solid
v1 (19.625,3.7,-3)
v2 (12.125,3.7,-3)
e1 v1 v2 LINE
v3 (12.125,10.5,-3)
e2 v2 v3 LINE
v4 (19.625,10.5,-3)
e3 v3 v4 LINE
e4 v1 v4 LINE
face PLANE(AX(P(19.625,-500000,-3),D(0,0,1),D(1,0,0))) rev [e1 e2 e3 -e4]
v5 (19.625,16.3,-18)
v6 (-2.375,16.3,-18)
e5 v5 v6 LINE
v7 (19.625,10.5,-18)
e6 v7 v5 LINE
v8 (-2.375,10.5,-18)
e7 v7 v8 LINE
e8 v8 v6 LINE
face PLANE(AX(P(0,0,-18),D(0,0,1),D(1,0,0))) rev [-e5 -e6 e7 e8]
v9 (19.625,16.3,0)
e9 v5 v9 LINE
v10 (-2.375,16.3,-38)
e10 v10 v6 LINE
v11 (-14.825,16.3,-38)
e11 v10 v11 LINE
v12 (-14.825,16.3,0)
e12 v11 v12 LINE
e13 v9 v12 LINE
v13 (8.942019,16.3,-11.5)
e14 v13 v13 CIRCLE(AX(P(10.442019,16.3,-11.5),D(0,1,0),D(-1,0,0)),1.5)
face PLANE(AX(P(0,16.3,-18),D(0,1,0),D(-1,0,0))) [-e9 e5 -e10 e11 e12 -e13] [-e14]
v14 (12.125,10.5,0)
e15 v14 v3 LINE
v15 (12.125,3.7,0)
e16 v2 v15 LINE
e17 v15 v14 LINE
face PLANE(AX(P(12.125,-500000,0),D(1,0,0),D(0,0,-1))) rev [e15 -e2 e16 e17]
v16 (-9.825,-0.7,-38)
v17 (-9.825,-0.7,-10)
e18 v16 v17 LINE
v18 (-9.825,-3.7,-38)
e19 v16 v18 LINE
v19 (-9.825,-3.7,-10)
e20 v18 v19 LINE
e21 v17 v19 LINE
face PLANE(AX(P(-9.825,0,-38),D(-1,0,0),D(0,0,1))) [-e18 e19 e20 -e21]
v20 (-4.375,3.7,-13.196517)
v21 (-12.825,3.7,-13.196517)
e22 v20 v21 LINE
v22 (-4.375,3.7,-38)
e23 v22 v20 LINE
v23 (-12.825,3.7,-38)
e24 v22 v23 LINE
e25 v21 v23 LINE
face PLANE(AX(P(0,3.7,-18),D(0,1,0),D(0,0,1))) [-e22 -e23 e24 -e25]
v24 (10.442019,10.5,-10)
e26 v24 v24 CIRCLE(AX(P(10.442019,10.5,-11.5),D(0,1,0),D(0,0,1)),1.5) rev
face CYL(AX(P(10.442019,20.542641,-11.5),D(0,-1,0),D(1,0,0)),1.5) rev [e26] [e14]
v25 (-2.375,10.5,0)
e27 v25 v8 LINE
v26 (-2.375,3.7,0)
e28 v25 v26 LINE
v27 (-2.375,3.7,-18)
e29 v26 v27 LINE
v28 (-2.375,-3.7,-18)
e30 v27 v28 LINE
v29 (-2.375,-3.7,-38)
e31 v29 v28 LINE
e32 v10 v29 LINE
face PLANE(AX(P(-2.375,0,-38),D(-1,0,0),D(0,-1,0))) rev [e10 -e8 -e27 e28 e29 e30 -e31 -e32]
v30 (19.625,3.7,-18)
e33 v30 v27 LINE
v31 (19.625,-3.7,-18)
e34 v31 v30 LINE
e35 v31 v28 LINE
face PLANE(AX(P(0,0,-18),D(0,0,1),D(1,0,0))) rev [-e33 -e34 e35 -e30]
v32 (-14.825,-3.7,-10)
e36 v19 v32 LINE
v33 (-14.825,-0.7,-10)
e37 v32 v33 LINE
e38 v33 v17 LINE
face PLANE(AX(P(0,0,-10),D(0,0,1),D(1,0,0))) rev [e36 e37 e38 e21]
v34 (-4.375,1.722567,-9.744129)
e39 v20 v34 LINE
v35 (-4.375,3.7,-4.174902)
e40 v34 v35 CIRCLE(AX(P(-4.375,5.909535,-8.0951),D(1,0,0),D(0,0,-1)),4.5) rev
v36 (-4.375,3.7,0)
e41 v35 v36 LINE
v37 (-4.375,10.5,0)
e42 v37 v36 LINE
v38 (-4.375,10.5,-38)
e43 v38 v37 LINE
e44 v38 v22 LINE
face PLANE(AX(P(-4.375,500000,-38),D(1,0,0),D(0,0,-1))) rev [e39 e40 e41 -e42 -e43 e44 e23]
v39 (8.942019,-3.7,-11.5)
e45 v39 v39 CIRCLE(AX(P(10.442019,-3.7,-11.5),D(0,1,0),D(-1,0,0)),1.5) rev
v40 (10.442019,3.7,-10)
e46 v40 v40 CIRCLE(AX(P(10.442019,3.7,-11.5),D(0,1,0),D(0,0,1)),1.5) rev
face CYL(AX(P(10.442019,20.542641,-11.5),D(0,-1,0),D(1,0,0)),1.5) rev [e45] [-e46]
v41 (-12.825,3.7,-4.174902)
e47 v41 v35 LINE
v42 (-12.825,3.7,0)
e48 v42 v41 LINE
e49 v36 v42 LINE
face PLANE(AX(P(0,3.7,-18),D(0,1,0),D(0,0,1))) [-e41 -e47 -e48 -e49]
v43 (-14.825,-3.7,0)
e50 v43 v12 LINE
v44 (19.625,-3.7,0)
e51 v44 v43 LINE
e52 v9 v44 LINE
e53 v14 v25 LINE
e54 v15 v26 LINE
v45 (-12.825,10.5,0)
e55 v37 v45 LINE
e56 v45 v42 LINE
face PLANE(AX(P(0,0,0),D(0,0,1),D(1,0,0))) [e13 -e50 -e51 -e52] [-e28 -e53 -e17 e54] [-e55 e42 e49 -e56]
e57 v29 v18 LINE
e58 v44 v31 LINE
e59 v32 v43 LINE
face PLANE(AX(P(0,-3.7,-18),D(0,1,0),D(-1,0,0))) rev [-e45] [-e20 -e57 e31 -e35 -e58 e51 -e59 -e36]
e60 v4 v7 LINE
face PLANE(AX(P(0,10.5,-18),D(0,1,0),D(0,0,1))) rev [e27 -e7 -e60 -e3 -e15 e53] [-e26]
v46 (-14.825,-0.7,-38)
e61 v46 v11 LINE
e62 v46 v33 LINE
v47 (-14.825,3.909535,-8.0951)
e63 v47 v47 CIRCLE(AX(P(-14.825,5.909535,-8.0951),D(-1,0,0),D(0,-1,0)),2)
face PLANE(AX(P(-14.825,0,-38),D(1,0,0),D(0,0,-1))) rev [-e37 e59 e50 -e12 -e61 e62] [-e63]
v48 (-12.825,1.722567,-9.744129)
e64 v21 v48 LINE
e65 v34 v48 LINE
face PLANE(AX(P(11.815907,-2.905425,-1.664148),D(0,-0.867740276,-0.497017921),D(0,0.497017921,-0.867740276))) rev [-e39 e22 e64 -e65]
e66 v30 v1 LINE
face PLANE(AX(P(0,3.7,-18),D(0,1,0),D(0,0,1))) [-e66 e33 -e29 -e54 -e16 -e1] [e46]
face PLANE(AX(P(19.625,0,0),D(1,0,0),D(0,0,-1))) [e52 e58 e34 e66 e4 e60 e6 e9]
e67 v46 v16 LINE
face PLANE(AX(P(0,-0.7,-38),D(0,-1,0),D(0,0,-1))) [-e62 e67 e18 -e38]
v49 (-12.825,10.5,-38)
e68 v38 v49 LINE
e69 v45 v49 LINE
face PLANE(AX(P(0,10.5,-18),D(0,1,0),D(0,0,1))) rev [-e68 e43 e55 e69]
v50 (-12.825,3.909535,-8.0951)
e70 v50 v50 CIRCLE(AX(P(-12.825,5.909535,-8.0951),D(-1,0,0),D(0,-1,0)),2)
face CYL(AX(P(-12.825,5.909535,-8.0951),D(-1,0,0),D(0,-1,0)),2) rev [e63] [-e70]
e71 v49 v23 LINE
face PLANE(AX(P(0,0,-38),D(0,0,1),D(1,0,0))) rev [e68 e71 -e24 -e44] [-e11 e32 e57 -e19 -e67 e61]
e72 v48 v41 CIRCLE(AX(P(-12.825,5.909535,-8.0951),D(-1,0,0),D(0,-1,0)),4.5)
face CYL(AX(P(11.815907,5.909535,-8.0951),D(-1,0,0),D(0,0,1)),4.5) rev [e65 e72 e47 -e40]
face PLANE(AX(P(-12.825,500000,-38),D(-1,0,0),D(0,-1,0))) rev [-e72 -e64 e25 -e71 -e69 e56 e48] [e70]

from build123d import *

# Parameters (mm, degrees)
SKETCH1_W             = 19
SKETCH1_H             = 7.4
BOSS_EXTRUDE1_DEPTH   = 18
SKETCH1_H_2           = 5.8
BOSS_EXTRUDE1_2_DEPTH = 18
SKETCH1_6_W           = 12.45
SKETCH1_6_H           = 5.8
BOSS_EXTRUDE6_DEPTH   = 38
BOSS_EXTRUDE7_DEPTH   = 10
SKETCH4_W             = 18
SKETCH4_H             = 7.4
SKETCH4_H_2           = 5.8
BOSS_EXTRUDE8_DEPTH   = 3
CUT_EXTRUDE1_START    = -7.4
SKETCH6_R             = 1.5
CUT_EXTRUDE1_DEPTH    = 20
BOSS_EXTRUDE10_REACH  = 46.586
SKETCH7_W             = 2
SKETCH7_H             = 38
BOSS_EXTRUDE11_REACH  = 47.064
SKETCH8_W             = 7.5
SKETCH8_H             = 3
SKETCH9_R             = 2
CUT_EXTRUDE2_DEPTH    = 2
CUT_EXTRUDE3_START    = -10.45
CUT_EXTRUDE3_DEPTH    = 8.45


# Read off the part's stored shape, not the designer's step: Cut-Extrude3
with BuildPart() as part:
    # Sketch1 → Boss-Extrude1 (new body)
    with BuildSketch(Plane.XY):
        with Locations((7.125, 0)):
            Rectangle(SKETCH1_W, SKETCH1_H)
    extrude(amount=-BOSS_EXTRUDE1_DEPTH)



with BuildPart() as body_2:
    # Sketch1 → Boss-Extrude1 2 (new body)
    with BuildSketch(Plane.XY):
        with Locations((7.125, 13.4)):
            Rectangle(SKETCH1_W, SKETCH1_H_2)
    extrude(amount=-BOSS_EXTRUDE1_2_DEPTH)


with BuildPart() as part_1:
    add(part.part)

    add(body_2.part)  # Boss-Extrude6 merges body 2
    # Sketch1<6> → Boss-Extrude6 (add)
    with BuildSketch(Plane.XY):
        Polygon((-14.825, 3.7), (-14.825, -0.7), (-9.825, -0.7), (-9.825, -3.7), (-2.375, -3.7), (-2.375, 3.7), align=None)
        with Locations((-8.6, 13.4)):
            Rectangle(SKETCH1_6_W, SKETCH1_6_H)
    extrude(amount=-BOSS_EXTRUDE6_DEPTH)

    # Sketch1<7> → Boss-Extrude7 (add)
    with BuildSketch(Plane.XY):
        Polygon((-14.825, -0.7), (-14.825, -2), (-14.825, -3.7), (-9.825, -3.7), (-9.825, -0.7), align=None)
    extrude(amount=-BOSS_EXTRUDE7_DEPTH)

    # Sketch4 → Boss-Extrude8 (add)
    with BuildSketch(Plane(origin=(16.625, 0, 0), x_dir=(0, 0, -1), z_dir=(1, 0, 0))):
        with Locations((9, 0)):
            Rectangle(SKETCH4_W, SKETCH4_H)
        with Locations((9, 13.4)):
            Rectangle(SKETCH4_W, SKETCH4_H_2)
    extrude(amount=BOSS_EXTRUDE8_DEPTH)

    # Sketch6 → Cut-Extrude1 (cut)
    with BuildSketch(Plane(origin=(0, 3.7, 0), x_dir=(1, 0, 0), z_dir=(0, 1, 0)).offset(CUT_EXTRUDE1_START)):
        with Locations(Location((10.44201924, 11.5, 0), (0, 0, 270))):
            Circle(SKETCH6_R)
    extrude(amount=CUT_EXTRUDE1_DEPTH, mode=Mode.SUBTRACT)

    # Sketch7 → Boss-Extrude10 (add, up to next)
    with BuildSketch(Plane(origin=(0, 3.7, 0), x_dir=(1, 0, 0), z_dir=(0, 1, 0)), mode=Mode.PRIVATE) as boss_extrude10_sk1:
        with Locations((-3.375, 19)):
            Rectangle(SKETCH7_W, SKETCH7_H)
    boss_extrude10_tool1 = extrude(boss_extrude10_sk1.sketch, amount=BOSS_EXTRUDE10_REACH, mode=Mode.PRIVATE) - part_1.part
    # Sketch7 → Boss-Extrude10 (add, up to next)
    with BuildSketch(Plane(origin=(0, 3.7, 0), x_dir=(1, 0, 0), z_dir=(0, 1, 0)), mode=Mode.PRIVATE) as boss_extrude10_sk2:
        with Locations((-13.825, 19)):
            Rectangle(SKETCH7_W, SKETCH7_H)
    boss_extrude10_tool2 = extrude(boss_extrude10_sk2.sketch, amount=BOSS_EXTRUDE10_REACH, mode=Mode.PRIVATE) - part_1.part
    add(boss_extrude10_tool1.solids().sort_by_distance((-3.375, 3.7, -19))[0])
    add(boss_extrude10_tool2.solids().sort_by_distance((-13.825, 3.7, -19))[0])

    # Sketch8 → Boss-Extrude11 (add, up to next)
    with BuildSketch(Plane.XZ.offset(-10.5), mode=Mode.PRIVATE) as boss_extrude11_sk1:
        with Locations((15.875, -1.5)):
            Rectangle(SKETCH8_W, SKETCH8_H)
    boss_extrude11_tool1 = extrude(boss_extrude11_sk1.sketch, amount=BOSS_EXTRUDE11_REACH, mode=Mode.PRIVATE) - part_1.part
    add(boss_extrude11_tool1.solids().sort_by_distance((15.875, 10.5, -1.5))[0])

    # Sketch9 → Cut-Extrude2 (cut)
    with BuildSketch(Plane.ZY.offset(14.825)):
        with Locations(Location((-8.095100141, 5.909535031, 0), (0, 0, 270))):
            Circle(SKETCH9_R)
    extrude(amount=-CUT_EXTRUDE2_DEPTH, mode=Mode.SUBTRACT)

    # Cut-Extrude3 outline → Cut-Extrude3 (cut)
    with BuildSketch(Plane.ZY.offset(14.825).offset(CUT_EXTRUDE3_START)):
        with BuildLine():
            Line((-4.174901811, 3.7), (-13.196516677, 3.7))
            Line((-13.196516677, 3.7), (-9.744129164, 1.722566762))
            ThreePointArc((-9.744129164, 1.722566762), (-6.589406594, 1.668911616), (-4.174901811, 3.7))
        make_face()
    extrude(amount=CUT_EXTRUDE3_DEPTH, mode=Mode.SUBTRACT)


solid = part_1.part
